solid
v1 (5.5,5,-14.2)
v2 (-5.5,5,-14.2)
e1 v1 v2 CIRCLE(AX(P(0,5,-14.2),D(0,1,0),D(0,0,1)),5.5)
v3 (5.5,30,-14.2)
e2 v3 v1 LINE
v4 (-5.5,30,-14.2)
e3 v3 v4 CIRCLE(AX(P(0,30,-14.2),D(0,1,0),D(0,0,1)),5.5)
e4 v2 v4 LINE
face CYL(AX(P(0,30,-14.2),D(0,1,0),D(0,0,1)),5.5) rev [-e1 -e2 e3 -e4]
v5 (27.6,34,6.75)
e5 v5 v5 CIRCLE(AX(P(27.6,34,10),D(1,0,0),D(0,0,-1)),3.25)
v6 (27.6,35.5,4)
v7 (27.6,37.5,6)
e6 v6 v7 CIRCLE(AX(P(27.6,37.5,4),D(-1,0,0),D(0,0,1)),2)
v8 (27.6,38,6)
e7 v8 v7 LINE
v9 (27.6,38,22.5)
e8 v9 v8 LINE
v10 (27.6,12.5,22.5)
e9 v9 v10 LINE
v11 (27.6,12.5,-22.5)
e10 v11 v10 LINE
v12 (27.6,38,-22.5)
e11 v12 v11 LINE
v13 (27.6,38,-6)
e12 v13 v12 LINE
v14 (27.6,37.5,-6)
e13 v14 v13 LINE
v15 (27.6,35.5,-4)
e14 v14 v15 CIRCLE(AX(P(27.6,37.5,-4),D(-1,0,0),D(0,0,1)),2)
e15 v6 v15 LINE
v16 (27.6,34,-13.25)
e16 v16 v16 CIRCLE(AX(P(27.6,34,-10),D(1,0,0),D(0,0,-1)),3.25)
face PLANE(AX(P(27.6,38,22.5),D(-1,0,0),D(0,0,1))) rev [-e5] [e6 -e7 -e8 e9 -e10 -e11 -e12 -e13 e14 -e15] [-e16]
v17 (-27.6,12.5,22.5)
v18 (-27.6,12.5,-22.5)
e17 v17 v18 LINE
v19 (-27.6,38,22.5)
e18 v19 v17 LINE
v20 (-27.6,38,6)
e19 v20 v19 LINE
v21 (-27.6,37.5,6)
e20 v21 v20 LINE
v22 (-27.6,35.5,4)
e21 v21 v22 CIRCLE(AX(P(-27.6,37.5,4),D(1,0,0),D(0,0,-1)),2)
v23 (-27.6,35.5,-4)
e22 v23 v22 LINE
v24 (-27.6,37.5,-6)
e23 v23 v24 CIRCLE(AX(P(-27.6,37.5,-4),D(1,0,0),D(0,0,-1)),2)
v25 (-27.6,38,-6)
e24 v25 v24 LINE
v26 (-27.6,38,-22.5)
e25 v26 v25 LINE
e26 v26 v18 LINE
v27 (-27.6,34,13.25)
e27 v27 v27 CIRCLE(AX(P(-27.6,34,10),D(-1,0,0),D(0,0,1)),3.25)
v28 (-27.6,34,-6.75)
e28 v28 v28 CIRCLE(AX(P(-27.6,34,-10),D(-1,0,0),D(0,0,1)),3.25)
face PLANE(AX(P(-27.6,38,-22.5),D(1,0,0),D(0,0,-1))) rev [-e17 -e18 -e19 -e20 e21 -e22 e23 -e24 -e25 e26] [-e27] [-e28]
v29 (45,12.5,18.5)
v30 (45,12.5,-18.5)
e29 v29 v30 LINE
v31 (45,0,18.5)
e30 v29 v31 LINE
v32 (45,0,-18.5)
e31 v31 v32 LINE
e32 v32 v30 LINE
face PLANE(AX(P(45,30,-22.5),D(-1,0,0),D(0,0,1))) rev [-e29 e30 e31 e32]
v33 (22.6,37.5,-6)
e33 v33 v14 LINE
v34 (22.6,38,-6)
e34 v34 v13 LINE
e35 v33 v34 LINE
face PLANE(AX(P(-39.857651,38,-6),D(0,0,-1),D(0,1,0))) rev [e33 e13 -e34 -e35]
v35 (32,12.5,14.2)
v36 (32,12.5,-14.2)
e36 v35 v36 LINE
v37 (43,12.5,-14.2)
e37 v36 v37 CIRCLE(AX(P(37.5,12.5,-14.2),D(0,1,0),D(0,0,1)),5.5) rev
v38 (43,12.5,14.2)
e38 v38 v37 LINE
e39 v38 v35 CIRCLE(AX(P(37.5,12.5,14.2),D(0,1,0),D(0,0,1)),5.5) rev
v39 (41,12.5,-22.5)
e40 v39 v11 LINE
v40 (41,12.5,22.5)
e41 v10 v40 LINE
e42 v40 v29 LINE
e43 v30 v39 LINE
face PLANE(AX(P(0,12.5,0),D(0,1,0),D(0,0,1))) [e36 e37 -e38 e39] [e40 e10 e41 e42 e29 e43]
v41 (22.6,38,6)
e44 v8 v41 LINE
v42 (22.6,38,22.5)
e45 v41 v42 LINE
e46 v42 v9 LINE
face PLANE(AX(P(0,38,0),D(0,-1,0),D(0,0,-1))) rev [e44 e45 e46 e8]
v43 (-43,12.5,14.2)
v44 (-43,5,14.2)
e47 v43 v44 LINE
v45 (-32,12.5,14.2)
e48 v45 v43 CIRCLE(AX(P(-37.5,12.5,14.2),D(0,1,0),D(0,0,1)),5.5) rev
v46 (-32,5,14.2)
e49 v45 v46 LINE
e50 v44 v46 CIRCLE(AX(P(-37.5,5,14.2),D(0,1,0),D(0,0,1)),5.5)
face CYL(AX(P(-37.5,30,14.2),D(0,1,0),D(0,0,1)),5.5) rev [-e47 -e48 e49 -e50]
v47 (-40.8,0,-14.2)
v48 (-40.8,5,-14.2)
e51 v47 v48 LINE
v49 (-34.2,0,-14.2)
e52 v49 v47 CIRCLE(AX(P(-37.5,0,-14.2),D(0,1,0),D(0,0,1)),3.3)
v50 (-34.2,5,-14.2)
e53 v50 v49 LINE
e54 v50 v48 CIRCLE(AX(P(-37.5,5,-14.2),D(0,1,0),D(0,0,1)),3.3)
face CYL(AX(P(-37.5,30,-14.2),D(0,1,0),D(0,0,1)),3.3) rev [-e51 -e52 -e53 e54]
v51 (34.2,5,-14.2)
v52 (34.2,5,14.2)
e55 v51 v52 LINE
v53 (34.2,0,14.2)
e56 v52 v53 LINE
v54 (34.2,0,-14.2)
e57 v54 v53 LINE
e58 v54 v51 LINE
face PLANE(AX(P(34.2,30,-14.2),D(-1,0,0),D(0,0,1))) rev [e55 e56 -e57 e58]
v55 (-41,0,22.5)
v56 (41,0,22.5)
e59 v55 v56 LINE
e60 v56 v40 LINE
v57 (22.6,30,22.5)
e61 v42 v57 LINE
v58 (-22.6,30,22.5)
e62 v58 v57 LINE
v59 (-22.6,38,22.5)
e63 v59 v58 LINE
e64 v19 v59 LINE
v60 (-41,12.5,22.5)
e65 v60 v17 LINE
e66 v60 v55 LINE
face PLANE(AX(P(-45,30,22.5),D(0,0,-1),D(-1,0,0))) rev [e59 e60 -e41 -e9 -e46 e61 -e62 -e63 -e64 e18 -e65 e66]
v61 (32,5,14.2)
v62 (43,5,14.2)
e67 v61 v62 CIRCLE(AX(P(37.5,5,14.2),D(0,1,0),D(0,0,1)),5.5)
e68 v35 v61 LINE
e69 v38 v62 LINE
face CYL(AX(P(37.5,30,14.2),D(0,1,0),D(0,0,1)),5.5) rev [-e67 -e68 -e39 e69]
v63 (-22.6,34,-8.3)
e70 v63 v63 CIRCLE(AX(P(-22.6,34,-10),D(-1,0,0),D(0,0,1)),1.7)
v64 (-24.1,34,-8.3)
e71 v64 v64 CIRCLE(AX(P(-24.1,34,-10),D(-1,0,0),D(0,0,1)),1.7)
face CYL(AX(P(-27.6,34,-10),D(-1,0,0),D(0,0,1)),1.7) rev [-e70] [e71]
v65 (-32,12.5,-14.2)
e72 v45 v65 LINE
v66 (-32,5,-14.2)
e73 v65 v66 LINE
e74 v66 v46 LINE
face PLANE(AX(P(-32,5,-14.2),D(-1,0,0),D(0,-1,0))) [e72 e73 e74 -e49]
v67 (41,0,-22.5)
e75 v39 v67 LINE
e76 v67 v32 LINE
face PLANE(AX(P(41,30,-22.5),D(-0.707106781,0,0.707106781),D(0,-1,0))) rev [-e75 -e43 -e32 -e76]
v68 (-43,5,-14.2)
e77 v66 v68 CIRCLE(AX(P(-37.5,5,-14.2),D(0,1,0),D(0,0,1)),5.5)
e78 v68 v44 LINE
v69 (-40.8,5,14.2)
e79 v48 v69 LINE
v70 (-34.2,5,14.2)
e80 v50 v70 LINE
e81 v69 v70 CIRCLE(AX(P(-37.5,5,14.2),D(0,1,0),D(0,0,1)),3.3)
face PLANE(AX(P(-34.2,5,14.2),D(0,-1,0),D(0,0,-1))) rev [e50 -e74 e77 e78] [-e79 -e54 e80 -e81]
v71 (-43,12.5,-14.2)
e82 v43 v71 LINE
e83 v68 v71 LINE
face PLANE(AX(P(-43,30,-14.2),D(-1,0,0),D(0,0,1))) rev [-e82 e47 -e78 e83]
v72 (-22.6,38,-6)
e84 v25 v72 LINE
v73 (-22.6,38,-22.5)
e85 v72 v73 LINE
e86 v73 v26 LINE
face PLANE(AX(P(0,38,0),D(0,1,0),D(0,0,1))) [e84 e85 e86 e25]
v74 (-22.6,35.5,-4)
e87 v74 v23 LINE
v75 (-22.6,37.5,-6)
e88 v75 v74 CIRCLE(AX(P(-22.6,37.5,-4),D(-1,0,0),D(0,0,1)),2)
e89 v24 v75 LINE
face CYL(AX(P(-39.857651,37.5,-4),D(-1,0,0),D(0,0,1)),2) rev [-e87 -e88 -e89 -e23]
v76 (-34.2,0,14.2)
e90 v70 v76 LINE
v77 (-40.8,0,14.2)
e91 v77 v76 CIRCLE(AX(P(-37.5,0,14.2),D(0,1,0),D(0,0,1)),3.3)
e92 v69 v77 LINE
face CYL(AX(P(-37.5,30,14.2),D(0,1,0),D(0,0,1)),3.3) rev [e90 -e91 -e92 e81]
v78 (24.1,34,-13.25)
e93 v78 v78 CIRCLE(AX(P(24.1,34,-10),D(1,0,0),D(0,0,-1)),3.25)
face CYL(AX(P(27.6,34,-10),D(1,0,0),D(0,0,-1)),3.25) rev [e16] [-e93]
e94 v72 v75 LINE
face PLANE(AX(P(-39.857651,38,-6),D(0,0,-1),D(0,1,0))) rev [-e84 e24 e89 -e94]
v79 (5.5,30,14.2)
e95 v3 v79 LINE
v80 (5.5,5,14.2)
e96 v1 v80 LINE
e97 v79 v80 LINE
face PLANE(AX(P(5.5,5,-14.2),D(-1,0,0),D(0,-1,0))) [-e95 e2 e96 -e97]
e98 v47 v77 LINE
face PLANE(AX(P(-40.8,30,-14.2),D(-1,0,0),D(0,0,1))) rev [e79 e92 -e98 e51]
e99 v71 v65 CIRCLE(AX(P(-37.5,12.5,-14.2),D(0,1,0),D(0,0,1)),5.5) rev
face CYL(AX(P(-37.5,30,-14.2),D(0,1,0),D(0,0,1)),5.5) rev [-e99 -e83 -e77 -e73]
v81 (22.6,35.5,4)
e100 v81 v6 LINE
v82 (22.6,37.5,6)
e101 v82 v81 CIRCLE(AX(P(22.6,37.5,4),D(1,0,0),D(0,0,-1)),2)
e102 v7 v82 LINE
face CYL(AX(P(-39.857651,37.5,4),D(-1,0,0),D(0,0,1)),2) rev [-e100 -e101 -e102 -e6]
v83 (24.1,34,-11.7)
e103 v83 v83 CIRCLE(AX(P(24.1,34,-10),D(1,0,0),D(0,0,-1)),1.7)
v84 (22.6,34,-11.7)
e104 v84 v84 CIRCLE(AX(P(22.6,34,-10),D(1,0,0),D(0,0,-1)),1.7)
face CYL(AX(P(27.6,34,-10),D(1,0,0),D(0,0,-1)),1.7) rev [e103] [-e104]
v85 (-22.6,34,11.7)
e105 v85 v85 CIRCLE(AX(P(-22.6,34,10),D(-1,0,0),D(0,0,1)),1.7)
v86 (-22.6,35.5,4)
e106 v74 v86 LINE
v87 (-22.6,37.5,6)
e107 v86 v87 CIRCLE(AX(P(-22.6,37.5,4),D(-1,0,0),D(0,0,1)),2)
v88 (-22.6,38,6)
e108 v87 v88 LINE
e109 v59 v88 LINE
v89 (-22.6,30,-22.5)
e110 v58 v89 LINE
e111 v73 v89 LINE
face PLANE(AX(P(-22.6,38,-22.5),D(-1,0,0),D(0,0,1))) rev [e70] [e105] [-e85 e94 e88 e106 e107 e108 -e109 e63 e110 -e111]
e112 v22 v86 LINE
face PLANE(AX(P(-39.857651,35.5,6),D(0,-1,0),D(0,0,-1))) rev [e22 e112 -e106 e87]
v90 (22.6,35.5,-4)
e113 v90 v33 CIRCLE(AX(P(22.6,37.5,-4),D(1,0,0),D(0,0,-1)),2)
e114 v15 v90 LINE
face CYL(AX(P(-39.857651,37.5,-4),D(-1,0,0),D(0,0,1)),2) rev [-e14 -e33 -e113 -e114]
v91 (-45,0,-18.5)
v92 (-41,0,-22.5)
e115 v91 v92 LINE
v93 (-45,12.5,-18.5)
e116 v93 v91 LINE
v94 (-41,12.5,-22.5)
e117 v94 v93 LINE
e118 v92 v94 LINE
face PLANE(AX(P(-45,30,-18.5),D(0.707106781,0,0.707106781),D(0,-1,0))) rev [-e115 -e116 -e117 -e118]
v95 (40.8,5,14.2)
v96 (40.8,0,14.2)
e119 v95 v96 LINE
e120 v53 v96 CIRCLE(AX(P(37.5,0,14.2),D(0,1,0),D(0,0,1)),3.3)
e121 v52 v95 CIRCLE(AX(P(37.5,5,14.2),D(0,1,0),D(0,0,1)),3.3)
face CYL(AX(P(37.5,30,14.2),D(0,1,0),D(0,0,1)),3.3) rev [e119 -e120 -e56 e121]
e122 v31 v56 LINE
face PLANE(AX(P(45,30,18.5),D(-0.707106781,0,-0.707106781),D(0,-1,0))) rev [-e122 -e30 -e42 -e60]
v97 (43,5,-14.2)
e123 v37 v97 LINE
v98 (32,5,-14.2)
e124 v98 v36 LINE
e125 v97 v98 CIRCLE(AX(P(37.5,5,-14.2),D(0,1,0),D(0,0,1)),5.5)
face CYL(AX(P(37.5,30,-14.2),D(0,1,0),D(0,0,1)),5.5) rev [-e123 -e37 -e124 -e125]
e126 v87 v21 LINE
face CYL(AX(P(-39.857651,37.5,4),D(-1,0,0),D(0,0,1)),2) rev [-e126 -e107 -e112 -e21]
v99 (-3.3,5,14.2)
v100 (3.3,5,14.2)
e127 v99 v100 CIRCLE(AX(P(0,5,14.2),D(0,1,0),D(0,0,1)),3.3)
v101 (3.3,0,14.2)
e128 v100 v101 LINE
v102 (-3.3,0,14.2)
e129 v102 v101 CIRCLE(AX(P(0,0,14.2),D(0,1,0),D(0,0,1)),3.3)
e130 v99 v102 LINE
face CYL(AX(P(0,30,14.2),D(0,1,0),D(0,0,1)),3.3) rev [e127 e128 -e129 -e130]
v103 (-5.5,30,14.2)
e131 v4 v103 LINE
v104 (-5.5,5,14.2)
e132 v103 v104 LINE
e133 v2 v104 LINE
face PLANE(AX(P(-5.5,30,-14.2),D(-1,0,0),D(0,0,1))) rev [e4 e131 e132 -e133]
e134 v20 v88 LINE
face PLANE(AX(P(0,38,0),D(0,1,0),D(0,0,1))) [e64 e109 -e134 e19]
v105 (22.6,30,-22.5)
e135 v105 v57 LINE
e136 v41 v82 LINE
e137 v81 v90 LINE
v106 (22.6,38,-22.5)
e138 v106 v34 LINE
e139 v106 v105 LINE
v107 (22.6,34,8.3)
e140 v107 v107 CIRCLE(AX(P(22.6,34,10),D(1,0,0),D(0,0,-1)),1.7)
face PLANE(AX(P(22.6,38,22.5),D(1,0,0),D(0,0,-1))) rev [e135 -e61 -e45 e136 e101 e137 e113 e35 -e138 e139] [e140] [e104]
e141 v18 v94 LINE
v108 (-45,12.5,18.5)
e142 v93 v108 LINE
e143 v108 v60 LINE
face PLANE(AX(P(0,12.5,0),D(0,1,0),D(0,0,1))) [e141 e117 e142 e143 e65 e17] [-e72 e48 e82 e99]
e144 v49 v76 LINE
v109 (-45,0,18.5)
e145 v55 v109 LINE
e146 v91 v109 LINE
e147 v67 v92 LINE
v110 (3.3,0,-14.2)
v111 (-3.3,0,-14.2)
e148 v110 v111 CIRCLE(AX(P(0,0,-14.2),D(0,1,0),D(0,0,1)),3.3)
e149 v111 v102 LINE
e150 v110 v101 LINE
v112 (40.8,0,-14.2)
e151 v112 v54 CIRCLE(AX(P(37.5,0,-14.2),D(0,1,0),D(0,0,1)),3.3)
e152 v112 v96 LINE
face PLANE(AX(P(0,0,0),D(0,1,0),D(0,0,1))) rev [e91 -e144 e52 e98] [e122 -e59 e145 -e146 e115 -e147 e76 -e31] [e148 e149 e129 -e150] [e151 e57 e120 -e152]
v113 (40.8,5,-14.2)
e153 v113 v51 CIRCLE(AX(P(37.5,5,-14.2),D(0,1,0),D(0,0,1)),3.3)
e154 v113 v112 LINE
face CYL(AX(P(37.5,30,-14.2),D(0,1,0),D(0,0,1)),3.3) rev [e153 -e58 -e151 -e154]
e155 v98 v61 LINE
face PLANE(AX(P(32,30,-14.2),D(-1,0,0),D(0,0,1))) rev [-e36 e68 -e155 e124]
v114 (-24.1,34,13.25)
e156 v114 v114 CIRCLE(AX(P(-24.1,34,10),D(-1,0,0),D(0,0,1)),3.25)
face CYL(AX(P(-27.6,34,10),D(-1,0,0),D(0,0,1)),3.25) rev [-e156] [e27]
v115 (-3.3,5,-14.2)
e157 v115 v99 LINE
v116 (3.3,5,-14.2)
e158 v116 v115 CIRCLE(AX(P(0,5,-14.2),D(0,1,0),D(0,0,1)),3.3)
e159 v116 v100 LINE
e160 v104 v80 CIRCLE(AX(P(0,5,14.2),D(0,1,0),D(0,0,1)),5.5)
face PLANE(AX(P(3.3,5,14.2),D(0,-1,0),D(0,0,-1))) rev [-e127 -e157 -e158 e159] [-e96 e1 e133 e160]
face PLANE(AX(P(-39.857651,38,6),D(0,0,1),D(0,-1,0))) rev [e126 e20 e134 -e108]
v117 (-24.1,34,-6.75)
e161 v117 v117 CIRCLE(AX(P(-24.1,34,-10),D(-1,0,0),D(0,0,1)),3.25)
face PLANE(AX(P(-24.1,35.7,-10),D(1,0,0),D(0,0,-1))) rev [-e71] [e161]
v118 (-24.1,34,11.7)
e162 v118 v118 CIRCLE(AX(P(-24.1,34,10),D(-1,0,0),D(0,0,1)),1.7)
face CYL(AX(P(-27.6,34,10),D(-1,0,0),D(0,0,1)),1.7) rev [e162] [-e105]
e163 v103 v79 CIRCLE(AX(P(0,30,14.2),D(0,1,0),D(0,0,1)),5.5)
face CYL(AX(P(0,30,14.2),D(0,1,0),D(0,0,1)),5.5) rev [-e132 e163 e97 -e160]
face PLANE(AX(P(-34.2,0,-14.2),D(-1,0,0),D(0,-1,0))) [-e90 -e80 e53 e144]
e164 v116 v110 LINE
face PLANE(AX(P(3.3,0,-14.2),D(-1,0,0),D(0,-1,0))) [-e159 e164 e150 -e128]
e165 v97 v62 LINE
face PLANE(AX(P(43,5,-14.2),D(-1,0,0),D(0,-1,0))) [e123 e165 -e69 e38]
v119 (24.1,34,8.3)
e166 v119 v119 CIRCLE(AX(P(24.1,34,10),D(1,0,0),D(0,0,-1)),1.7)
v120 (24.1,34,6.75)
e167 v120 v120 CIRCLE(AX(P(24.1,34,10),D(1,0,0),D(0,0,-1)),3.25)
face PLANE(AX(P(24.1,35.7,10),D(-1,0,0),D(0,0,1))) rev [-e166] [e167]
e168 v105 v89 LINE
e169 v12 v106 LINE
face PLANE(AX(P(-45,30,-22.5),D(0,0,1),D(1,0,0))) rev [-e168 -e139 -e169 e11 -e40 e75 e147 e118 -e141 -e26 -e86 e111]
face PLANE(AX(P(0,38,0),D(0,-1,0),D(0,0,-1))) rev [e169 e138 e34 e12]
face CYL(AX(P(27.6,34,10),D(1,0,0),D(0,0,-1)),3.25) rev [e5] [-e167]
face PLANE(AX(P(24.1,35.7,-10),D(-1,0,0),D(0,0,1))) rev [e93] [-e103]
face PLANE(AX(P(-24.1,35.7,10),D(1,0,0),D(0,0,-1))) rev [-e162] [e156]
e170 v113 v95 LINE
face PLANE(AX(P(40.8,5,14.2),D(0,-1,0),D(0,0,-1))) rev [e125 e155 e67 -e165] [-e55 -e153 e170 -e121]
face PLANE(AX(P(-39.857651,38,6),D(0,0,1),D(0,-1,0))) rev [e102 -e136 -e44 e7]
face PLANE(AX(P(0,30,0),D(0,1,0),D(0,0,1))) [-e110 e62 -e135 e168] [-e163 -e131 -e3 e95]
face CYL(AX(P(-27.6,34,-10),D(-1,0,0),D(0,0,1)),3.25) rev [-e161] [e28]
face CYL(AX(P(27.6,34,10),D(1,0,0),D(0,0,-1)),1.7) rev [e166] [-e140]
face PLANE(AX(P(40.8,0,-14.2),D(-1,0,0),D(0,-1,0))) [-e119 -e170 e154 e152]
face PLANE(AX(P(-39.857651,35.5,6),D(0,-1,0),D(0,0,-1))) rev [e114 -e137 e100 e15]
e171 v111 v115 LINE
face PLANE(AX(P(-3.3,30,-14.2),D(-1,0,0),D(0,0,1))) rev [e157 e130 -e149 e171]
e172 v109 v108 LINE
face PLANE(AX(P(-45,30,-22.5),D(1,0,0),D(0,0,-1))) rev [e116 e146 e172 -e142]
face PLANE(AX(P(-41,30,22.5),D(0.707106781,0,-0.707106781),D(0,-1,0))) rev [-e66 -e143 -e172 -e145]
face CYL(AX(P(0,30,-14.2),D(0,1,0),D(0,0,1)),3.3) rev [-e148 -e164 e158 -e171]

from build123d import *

# Parameters (mm, degrees)
SKETCH1_W                                           = 90
SKETCH1_H                                           = 45
BOSS_EXTRUDE1_DEPTH                                 = 30
SKETCH2_W                                           = 5
SKETCH2_H                                           = 45
BOSS_EXTRUDE2_DEPTH                                 = 8
CBORE_START                                         = 5
CBORE_SLOT_FOR_M6_HEX_SOCKET_HEAD_CAP_SC_DEPTH      = 25
CBORE_SLOT_FOR_M6_HEX_SOCKET_HEAD_CA_3_DEPTH        = 5
CHAMFER2_SIZE                                       = 4
CBORE_FOR_M3_HEX_SOCKET_HEAD_CAP_SCREW1_D           = 3.4
CBORE_FOR_M3_HEX_SOCKET_HEAD_CAP_SCREW1_DEPTH       = 5
CBORE_FOR_M3_HEX_SOCKET_HEAD_CAP_SCREW1_CBORE_D     = 6.5
CBORE_FOR_M3_HEX_SOCKET_HEAD_CAP_SCREW1_CBORE_DEPTH = 3.5
CBORE_FOR_M3_HEX_SOCKET_HEAD_CAP_SCREW2_D           = 3.4
CBORE_FOR_M3_HEX_SOCKET_HEAD_CAP_SCREW2_CBORE_D     = 6.5
CBORE_FOR_M3_HEX_SOCKET_HEAD_CAP_SCREW2_CBORE_DEPTH = 3.5
CUT_EXTRUDE1_REACH                                  = 86.977
SKETCH11_W                                          = 12
SKETCH11_H                                          = 2.5
FILLET1_R                                           = 2
CUT_EXTRUDE3_DEPTH                                  = 17.5


# Read off the part's stored shape, not the designer's step: CBORE SLOT for M6 Hex Socket Head Cap Screw1
with BuildPart() as part:
    # Sketch1 → Boss-Extrude1 (new body)
    with BuildSketch(Plane(origin=(0, 0, 0), x_dir=(1, 0, 0), z_dir=(0, 1, 0))):
        Rectangle(SKETCH1_W, SKETCH1_H)
    extrude(amount=BOSS_EXTRUDE1_DEPTH)

    # Sketch2 → Boss-Extrude2 (add)
    with BuildSketch(Plane(origin=(0, 30, 0), x_dir=(1, 0, 0), z_dir=(0, 1, 0))):
        with Locations((-25.1, 0)):
            Rectangle(SKETCH2_W, SKETCH2_H)
        with Locations((25.1, 0)):
            Rectangle(SKETCH2_W, SKETCH2_H)
    extrude(amount=BOSS_EXTRUDE2_DEPTH)

    # CBORE SLOT for M6 Hex Socket Head Ca 2 → CBORE SLOT for M6 Hex Socket Head Cap Screw1 (cut)
    with BuildSketch(Plane(origin=(0, 0, 0), x_dir=(1, 0, 0), z_dir=(0, 1, 0)).offset(CBORE_START)):
        with BuildLine():
            Line((-5.5, 14.2), (-5.5, -14.2))
            ThreePointArc((-5.5, -14.2), (0, -19.7), (5.5, -14.2))
            Line((5.5, -14.2), (5.5, 14.2))
            ThreePointArc((5.5, 14.2), (0, 19.7), (-5.5, 14.2))
        make_face()
        with BuildLine():
            Line((32, 14.2), (32, -14.2))
            ThreePointArc((32, -14.2), (37.5, -19.7), (43, -14.2))
            Line((43, -14.2), (43, 14.2))
            ThreePointArc((43, 14.2), (37.5, 19.7), (32, 14.2))
        make_face()
        with BuildLine():
            Line((-43, 14.2), (-43, -14.2))
            ThreePointArc((-43, -14.2), (-37.5, -19.7), (-32, -14.2))
            Line((-32, -14.2), (-32, 14.2))
            ThreePointArc((-32, 14.2), (-37.5, 19.7), (-43, 14.2))
        make_face()
    extrude(amount=CBORE_SLOT_FOR_M6_HEX_SOCKET_HEAD_CAP_SC_DEPTH, mode=Mode.SUBTRACT)

    # CBORE SLOT for M6 Hex Socket Head Ca 3 o → CBORE SLOT for M6 Hex Socket Head Ca 3 (cut)
    with BuildSketch(Plane(origin=(0, 0, 0), x_dir=(1, 0, 0), z_dir=(0, 1, 0))):
        with BuildLine():
            Line((-3.3, 14.2), (-3.3, -14.2))
            ThreePointArc((-3.3, -14.2), (0, -17.5), (3.3, -14.2))
            Line((3.3, -14.2), (3.3, 14.2))
            ThreePointArc((3.3, 14.2), (0, 17.5), (-3.3, 14.2))
        make_face()
        with BuildLine():
            Line((34.2, 14.2), (34.2, -14.2))
            ThreePointArc((34.2, -14.2), (37.5, -17.5), (40.8, -14.2))
            Line((40.8, -14.2), (40.8, 14.2))
            ThreePointArc((40.8, 14.2), (37.5, 17.5), (34.2, 14.2))
        make_face()
        with BuildLine():
            Line((-40.8, 14.2), (-40.8, -14.2))
            ThreePointArc((-40.8, -14.2), (-37.5, -17.5), (-34.2, -14.2))
            Line((-34.2, -14.2), (-34.2, 14.2))
            ThreePointArc((-34.2, 14.2), (-37.5, 17.5), (-40.8, 14.2))
        make_face()
    extrude(amount=CBORE_SLOT_FOR_M6_HEX_SOCKET_HEAD_CA_3_DEPTH, mode=Mode.SUBTRACT)

    # Chamfer2
    chamfer2_edges = [part.edges().sort_by_distance(p)[0] for p in [
        (-45, 15, -22.5),
        (45, 15, -22.5),
        (45, 15, 22.5),
        (-45, 15, 22.5),
    ]]
    chamfer(chamfer2_edges, length=CHAMFER2_SIZE)

    # CBORE for M3 Hex Socket Head Cap Screw1
    with Locations(Plane(origin=(27.6, 0, 0), x_dir=(0, 0, -1), z_dir=(1, 0, 0))):
        with Locations((-10, 34), (10, 34)):
            CounterBoreHole(CBORE_FOR_M3_HEX_SOCKET_HEAD_CAP_SCREW1_D / 2, CBORE_FOR_M3_HEX_SOCKET_HEAD_CAP_SCREW1_CBORE_D / 2, CBORE_FOR_M3_HEX_SOCKET_HEAD_CAP_SCREW1_CBORE_DEPTH, depth=CBORE_FOR_M3_HEX_SOCKET_HEAD_CAP_SCREW1_DEPTH)

    # CBORE for M3 Hex Socket Head Cap Screw2 (through all)
    with Locations(Plane.ZY.offset(27.6)):
        with Locations((-10, 34), (10, 34)):
            CounterBoreHole(CBORE_FOR_M3_HEX_SOCKET_HEAD_CAP_SCREW2_D / 2, CBORE_FOR_M3_HEX_SOCKET_HEAD_CAP_SCREW2_CBORE_D / 2, CBORE_FOR_M3_HEX_SOCKET_HEAD_CAP_SCREW2_CBORE_DEPTH)

    # Cut-Extrude1: up to this face of the body (flat: up to its plane)
    cut_extrude1_end = Plane(part.part.faces().sort_by_distance((-27.6, 34, 0))[0])
    # Sketch11 → Cut-Extrude1 (cut, up to the picked face)
    with BuildSketch(Plane(origin=(27.6, 0, 0), x_dir=(0, 0, -1), z_dir=(1, 0, 0)), mode=Mode.PRIVATE) as cut_extrude1_sk1:
        with Locations((0, 36.75)):
            Rectangle(SKETCH11_W, SKETCH11_H)
    cut_extrude1_tool1 = split(extrude(cut_extrude1_sk1.sketch, amount=-CUT_EXTRUDE1_REACH, mode=Mode.PRIVATE), bisect_by=cut_extrude1_end, keep=Keep.BOTH, mode=Mode.PRIVATE)
    add(cut_extrude1_tool1.solids().sort_by(Axis((27.6, 36.75, 0), (-1, 0, 0)))[0], mode=Mode.SUBTRACT)

    # Fillet1
    fillet1_edges = [part.edges().sort_by_distance(p)[0] for p in [
        (-25.1, 35.5, -6),
        (25.1, 35.5, -6),
        (-25.1, 35.5, 6),
        (25.1, 35.5, 6),
    ]]
    fillet(fillet1_edges, radius=FILLET1_R)

    # Sketch13 → Cut-Extrude3 (cut)
    with BuildSketch(Plane(origin=(0, 30, 0), x_dir=(1, 0, 0), z_dir=(0, 1, 0))):
        Polygon((-45, 18.5), (-45, -18.5), (-41, -22.5), (-27.6, -22.5), (-27.6, 22.5), (-41, 22.5), align=None)
        Polygon((45, -18.5), (45, 18.5), (41, 22.5), (27.6, 22.5), (27.6, -22.5), (41, -22.5), align=None)
    extrude(amount=-CUT_EXTRUDE3_DEPTH, mode=Mode.SUBTRACT)


solid = part.part
